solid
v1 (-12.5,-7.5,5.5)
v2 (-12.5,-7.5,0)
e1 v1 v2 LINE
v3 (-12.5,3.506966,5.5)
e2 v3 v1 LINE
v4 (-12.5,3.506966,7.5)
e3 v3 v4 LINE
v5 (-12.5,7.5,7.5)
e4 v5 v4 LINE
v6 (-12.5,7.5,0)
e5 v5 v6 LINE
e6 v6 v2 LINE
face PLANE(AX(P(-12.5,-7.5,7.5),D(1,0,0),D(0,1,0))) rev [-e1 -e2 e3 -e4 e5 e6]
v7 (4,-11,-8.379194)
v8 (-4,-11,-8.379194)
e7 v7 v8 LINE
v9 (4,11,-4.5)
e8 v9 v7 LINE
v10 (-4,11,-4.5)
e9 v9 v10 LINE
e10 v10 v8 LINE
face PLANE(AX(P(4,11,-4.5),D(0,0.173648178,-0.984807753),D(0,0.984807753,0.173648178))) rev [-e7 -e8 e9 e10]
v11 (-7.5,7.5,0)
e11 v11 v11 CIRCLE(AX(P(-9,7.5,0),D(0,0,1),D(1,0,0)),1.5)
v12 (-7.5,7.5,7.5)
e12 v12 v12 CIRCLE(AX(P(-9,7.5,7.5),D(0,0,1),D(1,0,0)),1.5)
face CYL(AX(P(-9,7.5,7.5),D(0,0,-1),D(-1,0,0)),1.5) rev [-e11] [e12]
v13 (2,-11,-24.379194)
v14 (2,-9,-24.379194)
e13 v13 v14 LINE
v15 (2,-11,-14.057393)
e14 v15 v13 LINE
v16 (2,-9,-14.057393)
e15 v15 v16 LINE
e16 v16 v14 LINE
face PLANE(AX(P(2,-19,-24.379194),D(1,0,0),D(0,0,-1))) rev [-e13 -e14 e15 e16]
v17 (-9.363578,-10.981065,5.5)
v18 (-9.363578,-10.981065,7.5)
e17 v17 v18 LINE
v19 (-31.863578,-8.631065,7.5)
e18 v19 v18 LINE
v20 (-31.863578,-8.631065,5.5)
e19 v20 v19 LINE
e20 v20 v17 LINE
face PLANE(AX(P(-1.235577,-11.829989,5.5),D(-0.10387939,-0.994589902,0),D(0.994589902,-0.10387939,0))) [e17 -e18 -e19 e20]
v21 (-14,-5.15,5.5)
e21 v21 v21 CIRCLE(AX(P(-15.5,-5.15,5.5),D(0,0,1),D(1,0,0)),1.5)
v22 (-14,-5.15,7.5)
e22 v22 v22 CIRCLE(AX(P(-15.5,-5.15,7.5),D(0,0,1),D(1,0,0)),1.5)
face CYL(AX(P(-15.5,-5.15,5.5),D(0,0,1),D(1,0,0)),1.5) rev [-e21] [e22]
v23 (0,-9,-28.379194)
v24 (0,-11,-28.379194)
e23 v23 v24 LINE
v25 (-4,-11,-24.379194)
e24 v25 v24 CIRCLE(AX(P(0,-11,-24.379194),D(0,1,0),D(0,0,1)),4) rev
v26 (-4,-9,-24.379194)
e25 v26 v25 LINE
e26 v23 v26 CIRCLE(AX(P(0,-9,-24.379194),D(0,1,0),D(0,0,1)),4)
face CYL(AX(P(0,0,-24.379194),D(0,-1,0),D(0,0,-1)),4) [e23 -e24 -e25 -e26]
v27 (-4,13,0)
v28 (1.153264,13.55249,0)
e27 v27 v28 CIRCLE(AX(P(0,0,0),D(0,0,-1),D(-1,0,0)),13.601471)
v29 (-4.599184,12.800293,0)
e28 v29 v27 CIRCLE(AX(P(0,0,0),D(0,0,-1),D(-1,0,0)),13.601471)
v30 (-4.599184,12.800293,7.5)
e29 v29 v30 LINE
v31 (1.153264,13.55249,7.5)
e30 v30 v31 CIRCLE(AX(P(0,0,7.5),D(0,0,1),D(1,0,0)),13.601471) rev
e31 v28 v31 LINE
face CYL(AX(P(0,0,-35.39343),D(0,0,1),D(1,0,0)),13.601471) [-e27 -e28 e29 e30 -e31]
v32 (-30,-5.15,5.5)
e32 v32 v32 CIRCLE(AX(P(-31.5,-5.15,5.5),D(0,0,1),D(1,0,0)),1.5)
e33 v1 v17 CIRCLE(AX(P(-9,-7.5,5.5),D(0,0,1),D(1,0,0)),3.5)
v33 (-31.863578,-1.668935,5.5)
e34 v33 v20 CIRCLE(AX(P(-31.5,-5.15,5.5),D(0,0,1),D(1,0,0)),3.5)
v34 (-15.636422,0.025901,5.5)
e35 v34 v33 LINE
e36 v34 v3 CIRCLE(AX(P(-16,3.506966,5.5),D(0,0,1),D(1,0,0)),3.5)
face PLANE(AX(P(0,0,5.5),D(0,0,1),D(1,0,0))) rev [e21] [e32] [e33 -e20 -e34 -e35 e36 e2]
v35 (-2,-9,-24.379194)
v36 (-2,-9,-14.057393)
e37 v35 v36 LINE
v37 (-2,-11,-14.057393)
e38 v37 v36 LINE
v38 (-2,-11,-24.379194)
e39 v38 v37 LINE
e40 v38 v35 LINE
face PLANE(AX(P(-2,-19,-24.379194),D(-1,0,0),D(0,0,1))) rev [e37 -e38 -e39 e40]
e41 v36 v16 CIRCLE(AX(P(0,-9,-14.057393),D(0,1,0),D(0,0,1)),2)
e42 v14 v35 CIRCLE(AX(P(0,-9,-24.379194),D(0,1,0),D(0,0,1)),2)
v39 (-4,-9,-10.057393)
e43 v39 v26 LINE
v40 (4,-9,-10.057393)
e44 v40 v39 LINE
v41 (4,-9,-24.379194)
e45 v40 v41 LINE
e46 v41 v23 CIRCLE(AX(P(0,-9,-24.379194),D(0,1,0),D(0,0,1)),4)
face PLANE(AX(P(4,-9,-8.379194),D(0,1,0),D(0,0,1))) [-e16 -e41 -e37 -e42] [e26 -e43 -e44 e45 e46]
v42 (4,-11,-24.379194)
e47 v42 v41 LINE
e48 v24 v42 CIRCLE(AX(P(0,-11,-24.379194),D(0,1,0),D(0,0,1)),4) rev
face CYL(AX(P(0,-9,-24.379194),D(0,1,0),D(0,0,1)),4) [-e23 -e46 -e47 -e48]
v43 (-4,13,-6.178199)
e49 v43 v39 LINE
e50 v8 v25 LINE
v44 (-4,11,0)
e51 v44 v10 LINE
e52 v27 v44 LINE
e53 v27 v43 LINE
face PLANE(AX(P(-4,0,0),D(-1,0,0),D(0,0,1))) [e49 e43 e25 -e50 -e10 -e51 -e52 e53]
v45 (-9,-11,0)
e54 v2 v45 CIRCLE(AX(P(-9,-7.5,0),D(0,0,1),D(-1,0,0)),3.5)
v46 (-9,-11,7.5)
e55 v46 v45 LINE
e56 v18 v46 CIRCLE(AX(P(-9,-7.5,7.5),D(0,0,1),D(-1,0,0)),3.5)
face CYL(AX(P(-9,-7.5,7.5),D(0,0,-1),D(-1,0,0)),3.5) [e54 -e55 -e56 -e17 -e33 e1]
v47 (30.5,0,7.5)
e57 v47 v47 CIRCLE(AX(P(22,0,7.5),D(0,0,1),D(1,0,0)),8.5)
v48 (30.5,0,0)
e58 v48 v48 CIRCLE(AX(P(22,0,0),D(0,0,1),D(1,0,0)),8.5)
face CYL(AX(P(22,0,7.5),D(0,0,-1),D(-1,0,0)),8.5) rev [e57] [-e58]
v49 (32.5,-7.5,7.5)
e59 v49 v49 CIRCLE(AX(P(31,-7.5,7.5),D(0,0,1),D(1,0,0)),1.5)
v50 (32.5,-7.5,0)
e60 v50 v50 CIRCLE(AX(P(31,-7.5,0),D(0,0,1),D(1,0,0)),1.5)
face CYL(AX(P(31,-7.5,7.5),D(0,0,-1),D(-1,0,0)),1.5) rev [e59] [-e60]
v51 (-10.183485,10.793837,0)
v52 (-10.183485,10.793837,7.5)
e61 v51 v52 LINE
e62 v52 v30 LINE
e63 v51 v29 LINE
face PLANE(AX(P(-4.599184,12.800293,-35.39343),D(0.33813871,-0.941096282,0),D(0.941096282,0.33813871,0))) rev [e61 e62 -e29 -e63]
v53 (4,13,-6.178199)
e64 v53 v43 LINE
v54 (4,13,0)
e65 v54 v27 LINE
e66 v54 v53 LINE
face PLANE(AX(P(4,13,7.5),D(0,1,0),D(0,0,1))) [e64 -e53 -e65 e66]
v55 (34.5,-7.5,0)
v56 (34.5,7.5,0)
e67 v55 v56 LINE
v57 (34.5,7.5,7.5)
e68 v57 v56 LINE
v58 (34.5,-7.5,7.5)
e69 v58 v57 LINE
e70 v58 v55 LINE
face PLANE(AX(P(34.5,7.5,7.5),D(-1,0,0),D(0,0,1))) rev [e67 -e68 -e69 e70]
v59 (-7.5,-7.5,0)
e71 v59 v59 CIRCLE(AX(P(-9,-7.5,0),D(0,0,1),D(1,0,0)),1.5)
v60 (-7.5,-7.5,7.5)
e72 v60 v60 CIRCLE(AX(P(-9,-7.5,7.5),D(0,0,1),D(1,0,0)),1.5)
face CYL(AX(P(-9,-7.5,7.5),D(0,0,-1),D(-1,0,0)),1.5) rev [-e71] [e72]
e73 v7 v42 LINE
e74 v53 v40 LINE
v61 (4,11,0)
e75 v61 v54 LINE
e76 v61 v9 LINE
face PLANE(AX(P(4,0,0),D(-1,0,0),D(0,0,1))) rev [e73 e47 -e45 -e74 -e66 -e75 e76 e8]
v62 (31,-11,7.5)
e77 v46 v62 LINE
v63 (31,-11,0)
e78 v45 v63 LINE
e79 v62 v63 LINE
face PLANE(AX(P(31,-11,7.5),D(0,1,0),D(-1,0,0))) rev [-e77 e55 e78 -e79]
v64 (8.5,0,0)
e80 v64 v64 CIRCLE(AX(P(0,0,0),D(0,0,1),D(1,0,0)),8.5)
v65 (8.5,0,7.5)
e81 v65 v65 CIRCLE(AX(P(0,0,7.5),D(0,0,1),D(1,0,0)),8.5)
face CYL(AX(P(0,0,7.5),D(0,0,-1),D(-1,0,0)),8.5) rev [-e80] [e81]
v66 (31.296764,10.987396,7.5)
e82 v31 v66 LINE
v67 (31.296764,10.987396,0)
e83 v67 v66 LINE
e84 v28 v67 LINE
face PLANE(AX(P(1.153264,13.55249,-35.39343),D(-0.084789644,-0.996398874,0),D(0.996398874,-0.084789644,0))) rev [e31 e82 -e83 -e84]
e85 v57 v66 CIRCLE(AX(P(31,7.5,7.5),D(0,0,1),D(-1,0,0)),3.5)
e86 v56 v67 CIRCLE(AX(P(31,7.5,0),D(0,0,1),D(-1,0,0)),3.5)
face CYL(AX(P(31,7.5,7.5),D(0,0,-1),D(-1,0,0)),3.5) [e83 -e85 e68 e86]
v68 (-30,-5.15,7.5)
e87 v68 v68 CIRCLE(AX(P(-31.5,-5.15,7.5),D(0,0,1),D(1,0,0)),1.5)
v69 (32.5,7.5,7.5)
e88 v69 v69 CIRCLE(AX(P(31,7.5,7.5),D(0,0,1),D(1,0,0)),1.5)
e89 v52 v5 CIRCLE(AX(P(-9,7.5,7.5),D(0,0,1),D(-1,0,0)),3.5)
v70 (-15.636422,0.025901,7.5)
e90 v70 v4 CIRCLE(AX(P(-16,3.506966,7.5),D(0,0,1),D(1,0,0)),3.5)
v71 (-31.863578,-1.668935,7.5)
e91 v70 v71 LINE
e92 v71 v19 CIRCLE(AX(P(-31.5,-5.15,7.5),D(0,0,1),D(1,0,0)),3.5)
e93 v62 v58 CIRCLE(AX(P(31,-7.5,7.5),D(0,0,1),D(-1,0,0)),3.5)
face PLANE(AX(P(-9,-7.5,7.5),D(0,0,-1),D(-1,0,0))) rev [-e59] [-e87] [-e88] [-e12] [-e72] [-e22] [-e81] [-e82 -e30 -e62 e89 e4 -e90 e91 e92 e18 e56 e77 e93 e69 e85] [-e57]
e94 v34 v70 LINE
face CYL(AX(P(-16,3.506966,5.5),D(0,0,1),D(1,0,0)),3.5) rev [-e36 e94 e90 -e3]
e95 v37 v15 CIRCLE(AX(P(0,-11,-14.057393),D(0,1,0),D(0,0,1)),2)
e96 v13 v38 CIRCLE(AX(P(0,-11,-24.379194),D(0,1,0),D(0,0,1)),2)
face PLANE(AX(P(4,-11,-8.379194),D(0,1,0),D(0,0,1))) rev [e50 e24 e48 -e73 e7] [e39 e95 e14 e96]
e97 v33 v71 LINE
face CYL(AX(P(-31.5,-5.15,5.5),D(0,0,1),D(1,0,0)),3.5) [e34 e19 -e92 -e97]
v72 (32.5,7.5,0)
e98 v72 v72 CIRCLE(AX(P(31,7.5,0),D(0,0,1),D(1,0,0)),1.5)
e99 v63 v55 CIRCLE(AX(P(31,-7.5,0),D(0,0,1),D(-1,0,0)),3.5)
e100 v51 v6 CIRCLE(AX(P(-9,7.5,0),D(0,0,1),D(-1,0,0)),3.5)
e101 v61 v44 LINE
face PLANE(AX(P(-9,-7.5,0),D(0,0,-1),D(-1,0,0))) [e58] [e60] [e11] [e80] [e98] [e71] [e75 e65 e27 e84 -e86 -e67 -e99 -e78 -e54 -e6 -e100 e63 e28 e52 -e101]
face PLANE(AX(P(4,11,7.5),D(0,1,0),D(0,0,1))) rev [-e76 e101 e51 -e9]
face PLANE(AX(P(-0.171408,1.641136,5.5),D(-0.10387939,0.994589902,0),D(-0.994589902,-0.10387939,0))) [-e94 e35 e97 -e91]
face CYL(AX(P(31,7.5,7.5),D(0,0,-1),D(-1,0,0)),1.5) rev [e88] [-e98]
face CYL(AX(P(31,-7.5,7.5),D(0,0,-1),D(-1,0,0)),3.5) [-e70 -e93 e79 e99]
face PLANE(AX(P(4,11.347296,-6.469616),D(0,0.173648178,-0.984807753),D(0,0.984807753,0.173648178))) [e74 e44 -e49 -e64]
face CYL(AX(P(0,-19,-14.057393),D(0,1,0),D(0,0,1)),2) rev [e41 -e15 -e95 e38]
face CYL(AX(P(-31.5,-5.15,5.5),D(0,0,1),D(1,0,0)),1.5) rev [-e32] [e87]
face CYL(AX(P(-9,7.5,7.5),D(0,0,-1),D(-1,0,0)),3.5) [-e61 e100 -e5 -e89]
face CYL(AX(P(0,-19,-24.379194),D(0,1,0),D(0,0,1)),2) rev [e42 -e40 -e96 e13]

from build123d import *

# Parameters (mm, degrees)
SKETCH1_R           = 8.5
SKETCH1_R_2         = 1.5
BOSS_EXTRUDE1_DEPTH = 7.5
BOSS_EXTRUDE2_START = -2
SKETCH2_R           = 1.5
BOSS_EXTRUDE2_DEPTH = 2
EXTRUDE_THIN1_DEPTH = 4
BOSS_EXTRUDE3_START = -7.5
BOSS_EXTRUDE3_DEPTH = 7.5
CUT_EXTRUDE1_DEPTH  = 10
FILLET1_R           = 4


with BuildPart() as part:
    # Sketch1 → Boss-Extrude1 (new body)
    with BuildSketch(Plane.XY):
        with BuildLine():
            Line((-12.5, -7.5), (-12.5, 7.5))
            ThreePointArc((-12.5, 7.5), (-11.474873734, 9.974873734), (-9, 11))
            Line((-9, 11), (31, 11))
            ThreePointArc((31, 11), (33.474873734, 9.974873734), (34.5, 7.5))
            Line((34.5, 7.5), (34.5, -7.5))
            ThreePointArc((34.5, -7.5), (33.474873734, -9.974873734), (31, -11))
            Line((31, -11), (-9, -11))
            ThreePointArc((-9, -11), (-11.474873734, -9.974873734), (-12.5, -7.5))
        make_face()
        Circle(SKETCH1_R, mode=Mode.SUBTRACT)
        with Locations((22, 0)):
            Circle(SKETCH1_R, mode=Mode.SUBTRACT)
        with Locations((-9, 7.5)):
            Circle(SKETCH1_R_2, mode=Mode.SUBTRACT)
        with Locations((31, 7.5)):
            Circle(SKETCH1_R_2, mode=Mode.SUBTRACT)
        with Locations((31, -7.5)):
            Circle(SKETCH1_R_2, mode=Mode.SUBTRACT)
        with Locations((-9, -7.5)):
            Circle(SKETCH1_R_2, mode=Mode.SUBTRACT)
    extrude(amount=BOSS_EXTRUDE1_DEPTH)

    # Sketch2 → Boss-Extrude2 (add)
    with BuildSketch(Plane.XY.offset(7.5).offset(BOSS_EXTRUDE2_START)):
        with BuildLine():
            ThreePointArc((-12.5, 3.506965576), (-13.399757461, 1.164159836), (-15.636422136, 0.025900921))
            Line((-15.636422136, 0.025900921), (-31.863577864, -1.668935344))
            ThreePointArc((-31.863577864, -1.668935344), (-35, -5.15), (-31.863577864, -8.631064656))
            Line((-31.863577864, -8.631064656), (-9.363577864, -10.981064656))
            ThreePointArc((-9.363577864, -10.981064656), (-11.600242539, -9.842805741), (-12.5, -7.5))
            Line((-12.5, -7.5), (-12.5, 3.506965576))
        make_face()
        with Locations((-31.5, -5.15)):
            Circle(SKETCH2_R, mode=Mode.SUBTRACT)
        with Locations((-15.5, -5.15)):
            Circle(SKETCH2_R, mode=Mode.SUBTRACT)
    extrude(amount=BOSS_EXTRUDE2_DEPTH)

    # Sketch3 → Extrude-Thin1 (add, symmetric)
    with BuildSketch(Plane(origin=(0, 0, 0), x_dir=(0, 0, -1), z_dir=(1, 0, 0))):
        Polygon((-7.5, 11), (4.5, 11), (8.379193576, -11), (28.379193576, -11), (28.379193576, -9), (10.057392838, -9), (6.178199262, 13), (-7.5, 13), align=None)
    extrude(amount=EXTRUDE_THIN1_DEPTH, both=True)

    # Sketch4 → Boss-Extrude3 (add)
    with BuildSketch(Plane.XY.offset(7.5).offset(BOSS_EXTRUDE3_START)):
        with BuildLine():
            Line((-4.599183693, 12.800293331), (-10.183485485, 10.793836988))
            ThreePointArc((-10.183485485, 10.793836988), (-9.600654035, 10.948074061), (-9, 11))
            Line((-9, 11), (-4, 11))
            Line((-4, 11), (-4, 13))
            ThreePointArc((-4, 13), (-4.300751183, 12.903625044), (-4.599183693, 12.800293331))
        make_face()
        with BuildLine():
            ThreePointArc((1.153263837, 13.552489901), (-1.449926884, 13.523968058), (-4, 13))
            Line((-4, 13), (4, 13))
            Line((4, 13), (4, 11))
            Line((4, 11), (31, 11))
            ThreePointArc((31, 11), (31.148515642, 10.996847595), (31.296763753, 10.987396059))
            Line((31.296763753, 10.987396059), (1.153263837, 13.552489901))
        make_face()
    extrude(amount=BOSS_EXTRUDE3_DEPTH)

    # Sketch5 → Cut-Extrude1 (cut)
    with BuildSketch(Plane(origin=(0, -9, 0), x_dir=(1, 0, 0), z_dir=(0, 1, 0))):
        with BuildLine():
            Line((2, 24.379193576), (2, 14.057392838))
            ThreePointArc((2, 14.057392838), (0, 12.057392838), (-2, 14.057392838))
            Line((-2, 14.057392838), (-2, 24.379193576))
            ThreePointArc((-2, 24.379193576), (0, 26.379193576), (2, 24.379193576))
        make_face()
    extrude(amount=-CUT_EXTRUDE1_DEPTH, mode=Mode.SUBTRACT)

    # Fillet1
    fillet1_edges = [part.edges().sort_by_distance(p)[0] for p in [
        (-4, -10, -28.379193576),
        (4, -10, -28.379193576),
    ]]
    fillet(fillet1_edges, radius=FILLET1_R - 0.0001)  # a hair under: the kernel refuses the full size


solid = part.part
